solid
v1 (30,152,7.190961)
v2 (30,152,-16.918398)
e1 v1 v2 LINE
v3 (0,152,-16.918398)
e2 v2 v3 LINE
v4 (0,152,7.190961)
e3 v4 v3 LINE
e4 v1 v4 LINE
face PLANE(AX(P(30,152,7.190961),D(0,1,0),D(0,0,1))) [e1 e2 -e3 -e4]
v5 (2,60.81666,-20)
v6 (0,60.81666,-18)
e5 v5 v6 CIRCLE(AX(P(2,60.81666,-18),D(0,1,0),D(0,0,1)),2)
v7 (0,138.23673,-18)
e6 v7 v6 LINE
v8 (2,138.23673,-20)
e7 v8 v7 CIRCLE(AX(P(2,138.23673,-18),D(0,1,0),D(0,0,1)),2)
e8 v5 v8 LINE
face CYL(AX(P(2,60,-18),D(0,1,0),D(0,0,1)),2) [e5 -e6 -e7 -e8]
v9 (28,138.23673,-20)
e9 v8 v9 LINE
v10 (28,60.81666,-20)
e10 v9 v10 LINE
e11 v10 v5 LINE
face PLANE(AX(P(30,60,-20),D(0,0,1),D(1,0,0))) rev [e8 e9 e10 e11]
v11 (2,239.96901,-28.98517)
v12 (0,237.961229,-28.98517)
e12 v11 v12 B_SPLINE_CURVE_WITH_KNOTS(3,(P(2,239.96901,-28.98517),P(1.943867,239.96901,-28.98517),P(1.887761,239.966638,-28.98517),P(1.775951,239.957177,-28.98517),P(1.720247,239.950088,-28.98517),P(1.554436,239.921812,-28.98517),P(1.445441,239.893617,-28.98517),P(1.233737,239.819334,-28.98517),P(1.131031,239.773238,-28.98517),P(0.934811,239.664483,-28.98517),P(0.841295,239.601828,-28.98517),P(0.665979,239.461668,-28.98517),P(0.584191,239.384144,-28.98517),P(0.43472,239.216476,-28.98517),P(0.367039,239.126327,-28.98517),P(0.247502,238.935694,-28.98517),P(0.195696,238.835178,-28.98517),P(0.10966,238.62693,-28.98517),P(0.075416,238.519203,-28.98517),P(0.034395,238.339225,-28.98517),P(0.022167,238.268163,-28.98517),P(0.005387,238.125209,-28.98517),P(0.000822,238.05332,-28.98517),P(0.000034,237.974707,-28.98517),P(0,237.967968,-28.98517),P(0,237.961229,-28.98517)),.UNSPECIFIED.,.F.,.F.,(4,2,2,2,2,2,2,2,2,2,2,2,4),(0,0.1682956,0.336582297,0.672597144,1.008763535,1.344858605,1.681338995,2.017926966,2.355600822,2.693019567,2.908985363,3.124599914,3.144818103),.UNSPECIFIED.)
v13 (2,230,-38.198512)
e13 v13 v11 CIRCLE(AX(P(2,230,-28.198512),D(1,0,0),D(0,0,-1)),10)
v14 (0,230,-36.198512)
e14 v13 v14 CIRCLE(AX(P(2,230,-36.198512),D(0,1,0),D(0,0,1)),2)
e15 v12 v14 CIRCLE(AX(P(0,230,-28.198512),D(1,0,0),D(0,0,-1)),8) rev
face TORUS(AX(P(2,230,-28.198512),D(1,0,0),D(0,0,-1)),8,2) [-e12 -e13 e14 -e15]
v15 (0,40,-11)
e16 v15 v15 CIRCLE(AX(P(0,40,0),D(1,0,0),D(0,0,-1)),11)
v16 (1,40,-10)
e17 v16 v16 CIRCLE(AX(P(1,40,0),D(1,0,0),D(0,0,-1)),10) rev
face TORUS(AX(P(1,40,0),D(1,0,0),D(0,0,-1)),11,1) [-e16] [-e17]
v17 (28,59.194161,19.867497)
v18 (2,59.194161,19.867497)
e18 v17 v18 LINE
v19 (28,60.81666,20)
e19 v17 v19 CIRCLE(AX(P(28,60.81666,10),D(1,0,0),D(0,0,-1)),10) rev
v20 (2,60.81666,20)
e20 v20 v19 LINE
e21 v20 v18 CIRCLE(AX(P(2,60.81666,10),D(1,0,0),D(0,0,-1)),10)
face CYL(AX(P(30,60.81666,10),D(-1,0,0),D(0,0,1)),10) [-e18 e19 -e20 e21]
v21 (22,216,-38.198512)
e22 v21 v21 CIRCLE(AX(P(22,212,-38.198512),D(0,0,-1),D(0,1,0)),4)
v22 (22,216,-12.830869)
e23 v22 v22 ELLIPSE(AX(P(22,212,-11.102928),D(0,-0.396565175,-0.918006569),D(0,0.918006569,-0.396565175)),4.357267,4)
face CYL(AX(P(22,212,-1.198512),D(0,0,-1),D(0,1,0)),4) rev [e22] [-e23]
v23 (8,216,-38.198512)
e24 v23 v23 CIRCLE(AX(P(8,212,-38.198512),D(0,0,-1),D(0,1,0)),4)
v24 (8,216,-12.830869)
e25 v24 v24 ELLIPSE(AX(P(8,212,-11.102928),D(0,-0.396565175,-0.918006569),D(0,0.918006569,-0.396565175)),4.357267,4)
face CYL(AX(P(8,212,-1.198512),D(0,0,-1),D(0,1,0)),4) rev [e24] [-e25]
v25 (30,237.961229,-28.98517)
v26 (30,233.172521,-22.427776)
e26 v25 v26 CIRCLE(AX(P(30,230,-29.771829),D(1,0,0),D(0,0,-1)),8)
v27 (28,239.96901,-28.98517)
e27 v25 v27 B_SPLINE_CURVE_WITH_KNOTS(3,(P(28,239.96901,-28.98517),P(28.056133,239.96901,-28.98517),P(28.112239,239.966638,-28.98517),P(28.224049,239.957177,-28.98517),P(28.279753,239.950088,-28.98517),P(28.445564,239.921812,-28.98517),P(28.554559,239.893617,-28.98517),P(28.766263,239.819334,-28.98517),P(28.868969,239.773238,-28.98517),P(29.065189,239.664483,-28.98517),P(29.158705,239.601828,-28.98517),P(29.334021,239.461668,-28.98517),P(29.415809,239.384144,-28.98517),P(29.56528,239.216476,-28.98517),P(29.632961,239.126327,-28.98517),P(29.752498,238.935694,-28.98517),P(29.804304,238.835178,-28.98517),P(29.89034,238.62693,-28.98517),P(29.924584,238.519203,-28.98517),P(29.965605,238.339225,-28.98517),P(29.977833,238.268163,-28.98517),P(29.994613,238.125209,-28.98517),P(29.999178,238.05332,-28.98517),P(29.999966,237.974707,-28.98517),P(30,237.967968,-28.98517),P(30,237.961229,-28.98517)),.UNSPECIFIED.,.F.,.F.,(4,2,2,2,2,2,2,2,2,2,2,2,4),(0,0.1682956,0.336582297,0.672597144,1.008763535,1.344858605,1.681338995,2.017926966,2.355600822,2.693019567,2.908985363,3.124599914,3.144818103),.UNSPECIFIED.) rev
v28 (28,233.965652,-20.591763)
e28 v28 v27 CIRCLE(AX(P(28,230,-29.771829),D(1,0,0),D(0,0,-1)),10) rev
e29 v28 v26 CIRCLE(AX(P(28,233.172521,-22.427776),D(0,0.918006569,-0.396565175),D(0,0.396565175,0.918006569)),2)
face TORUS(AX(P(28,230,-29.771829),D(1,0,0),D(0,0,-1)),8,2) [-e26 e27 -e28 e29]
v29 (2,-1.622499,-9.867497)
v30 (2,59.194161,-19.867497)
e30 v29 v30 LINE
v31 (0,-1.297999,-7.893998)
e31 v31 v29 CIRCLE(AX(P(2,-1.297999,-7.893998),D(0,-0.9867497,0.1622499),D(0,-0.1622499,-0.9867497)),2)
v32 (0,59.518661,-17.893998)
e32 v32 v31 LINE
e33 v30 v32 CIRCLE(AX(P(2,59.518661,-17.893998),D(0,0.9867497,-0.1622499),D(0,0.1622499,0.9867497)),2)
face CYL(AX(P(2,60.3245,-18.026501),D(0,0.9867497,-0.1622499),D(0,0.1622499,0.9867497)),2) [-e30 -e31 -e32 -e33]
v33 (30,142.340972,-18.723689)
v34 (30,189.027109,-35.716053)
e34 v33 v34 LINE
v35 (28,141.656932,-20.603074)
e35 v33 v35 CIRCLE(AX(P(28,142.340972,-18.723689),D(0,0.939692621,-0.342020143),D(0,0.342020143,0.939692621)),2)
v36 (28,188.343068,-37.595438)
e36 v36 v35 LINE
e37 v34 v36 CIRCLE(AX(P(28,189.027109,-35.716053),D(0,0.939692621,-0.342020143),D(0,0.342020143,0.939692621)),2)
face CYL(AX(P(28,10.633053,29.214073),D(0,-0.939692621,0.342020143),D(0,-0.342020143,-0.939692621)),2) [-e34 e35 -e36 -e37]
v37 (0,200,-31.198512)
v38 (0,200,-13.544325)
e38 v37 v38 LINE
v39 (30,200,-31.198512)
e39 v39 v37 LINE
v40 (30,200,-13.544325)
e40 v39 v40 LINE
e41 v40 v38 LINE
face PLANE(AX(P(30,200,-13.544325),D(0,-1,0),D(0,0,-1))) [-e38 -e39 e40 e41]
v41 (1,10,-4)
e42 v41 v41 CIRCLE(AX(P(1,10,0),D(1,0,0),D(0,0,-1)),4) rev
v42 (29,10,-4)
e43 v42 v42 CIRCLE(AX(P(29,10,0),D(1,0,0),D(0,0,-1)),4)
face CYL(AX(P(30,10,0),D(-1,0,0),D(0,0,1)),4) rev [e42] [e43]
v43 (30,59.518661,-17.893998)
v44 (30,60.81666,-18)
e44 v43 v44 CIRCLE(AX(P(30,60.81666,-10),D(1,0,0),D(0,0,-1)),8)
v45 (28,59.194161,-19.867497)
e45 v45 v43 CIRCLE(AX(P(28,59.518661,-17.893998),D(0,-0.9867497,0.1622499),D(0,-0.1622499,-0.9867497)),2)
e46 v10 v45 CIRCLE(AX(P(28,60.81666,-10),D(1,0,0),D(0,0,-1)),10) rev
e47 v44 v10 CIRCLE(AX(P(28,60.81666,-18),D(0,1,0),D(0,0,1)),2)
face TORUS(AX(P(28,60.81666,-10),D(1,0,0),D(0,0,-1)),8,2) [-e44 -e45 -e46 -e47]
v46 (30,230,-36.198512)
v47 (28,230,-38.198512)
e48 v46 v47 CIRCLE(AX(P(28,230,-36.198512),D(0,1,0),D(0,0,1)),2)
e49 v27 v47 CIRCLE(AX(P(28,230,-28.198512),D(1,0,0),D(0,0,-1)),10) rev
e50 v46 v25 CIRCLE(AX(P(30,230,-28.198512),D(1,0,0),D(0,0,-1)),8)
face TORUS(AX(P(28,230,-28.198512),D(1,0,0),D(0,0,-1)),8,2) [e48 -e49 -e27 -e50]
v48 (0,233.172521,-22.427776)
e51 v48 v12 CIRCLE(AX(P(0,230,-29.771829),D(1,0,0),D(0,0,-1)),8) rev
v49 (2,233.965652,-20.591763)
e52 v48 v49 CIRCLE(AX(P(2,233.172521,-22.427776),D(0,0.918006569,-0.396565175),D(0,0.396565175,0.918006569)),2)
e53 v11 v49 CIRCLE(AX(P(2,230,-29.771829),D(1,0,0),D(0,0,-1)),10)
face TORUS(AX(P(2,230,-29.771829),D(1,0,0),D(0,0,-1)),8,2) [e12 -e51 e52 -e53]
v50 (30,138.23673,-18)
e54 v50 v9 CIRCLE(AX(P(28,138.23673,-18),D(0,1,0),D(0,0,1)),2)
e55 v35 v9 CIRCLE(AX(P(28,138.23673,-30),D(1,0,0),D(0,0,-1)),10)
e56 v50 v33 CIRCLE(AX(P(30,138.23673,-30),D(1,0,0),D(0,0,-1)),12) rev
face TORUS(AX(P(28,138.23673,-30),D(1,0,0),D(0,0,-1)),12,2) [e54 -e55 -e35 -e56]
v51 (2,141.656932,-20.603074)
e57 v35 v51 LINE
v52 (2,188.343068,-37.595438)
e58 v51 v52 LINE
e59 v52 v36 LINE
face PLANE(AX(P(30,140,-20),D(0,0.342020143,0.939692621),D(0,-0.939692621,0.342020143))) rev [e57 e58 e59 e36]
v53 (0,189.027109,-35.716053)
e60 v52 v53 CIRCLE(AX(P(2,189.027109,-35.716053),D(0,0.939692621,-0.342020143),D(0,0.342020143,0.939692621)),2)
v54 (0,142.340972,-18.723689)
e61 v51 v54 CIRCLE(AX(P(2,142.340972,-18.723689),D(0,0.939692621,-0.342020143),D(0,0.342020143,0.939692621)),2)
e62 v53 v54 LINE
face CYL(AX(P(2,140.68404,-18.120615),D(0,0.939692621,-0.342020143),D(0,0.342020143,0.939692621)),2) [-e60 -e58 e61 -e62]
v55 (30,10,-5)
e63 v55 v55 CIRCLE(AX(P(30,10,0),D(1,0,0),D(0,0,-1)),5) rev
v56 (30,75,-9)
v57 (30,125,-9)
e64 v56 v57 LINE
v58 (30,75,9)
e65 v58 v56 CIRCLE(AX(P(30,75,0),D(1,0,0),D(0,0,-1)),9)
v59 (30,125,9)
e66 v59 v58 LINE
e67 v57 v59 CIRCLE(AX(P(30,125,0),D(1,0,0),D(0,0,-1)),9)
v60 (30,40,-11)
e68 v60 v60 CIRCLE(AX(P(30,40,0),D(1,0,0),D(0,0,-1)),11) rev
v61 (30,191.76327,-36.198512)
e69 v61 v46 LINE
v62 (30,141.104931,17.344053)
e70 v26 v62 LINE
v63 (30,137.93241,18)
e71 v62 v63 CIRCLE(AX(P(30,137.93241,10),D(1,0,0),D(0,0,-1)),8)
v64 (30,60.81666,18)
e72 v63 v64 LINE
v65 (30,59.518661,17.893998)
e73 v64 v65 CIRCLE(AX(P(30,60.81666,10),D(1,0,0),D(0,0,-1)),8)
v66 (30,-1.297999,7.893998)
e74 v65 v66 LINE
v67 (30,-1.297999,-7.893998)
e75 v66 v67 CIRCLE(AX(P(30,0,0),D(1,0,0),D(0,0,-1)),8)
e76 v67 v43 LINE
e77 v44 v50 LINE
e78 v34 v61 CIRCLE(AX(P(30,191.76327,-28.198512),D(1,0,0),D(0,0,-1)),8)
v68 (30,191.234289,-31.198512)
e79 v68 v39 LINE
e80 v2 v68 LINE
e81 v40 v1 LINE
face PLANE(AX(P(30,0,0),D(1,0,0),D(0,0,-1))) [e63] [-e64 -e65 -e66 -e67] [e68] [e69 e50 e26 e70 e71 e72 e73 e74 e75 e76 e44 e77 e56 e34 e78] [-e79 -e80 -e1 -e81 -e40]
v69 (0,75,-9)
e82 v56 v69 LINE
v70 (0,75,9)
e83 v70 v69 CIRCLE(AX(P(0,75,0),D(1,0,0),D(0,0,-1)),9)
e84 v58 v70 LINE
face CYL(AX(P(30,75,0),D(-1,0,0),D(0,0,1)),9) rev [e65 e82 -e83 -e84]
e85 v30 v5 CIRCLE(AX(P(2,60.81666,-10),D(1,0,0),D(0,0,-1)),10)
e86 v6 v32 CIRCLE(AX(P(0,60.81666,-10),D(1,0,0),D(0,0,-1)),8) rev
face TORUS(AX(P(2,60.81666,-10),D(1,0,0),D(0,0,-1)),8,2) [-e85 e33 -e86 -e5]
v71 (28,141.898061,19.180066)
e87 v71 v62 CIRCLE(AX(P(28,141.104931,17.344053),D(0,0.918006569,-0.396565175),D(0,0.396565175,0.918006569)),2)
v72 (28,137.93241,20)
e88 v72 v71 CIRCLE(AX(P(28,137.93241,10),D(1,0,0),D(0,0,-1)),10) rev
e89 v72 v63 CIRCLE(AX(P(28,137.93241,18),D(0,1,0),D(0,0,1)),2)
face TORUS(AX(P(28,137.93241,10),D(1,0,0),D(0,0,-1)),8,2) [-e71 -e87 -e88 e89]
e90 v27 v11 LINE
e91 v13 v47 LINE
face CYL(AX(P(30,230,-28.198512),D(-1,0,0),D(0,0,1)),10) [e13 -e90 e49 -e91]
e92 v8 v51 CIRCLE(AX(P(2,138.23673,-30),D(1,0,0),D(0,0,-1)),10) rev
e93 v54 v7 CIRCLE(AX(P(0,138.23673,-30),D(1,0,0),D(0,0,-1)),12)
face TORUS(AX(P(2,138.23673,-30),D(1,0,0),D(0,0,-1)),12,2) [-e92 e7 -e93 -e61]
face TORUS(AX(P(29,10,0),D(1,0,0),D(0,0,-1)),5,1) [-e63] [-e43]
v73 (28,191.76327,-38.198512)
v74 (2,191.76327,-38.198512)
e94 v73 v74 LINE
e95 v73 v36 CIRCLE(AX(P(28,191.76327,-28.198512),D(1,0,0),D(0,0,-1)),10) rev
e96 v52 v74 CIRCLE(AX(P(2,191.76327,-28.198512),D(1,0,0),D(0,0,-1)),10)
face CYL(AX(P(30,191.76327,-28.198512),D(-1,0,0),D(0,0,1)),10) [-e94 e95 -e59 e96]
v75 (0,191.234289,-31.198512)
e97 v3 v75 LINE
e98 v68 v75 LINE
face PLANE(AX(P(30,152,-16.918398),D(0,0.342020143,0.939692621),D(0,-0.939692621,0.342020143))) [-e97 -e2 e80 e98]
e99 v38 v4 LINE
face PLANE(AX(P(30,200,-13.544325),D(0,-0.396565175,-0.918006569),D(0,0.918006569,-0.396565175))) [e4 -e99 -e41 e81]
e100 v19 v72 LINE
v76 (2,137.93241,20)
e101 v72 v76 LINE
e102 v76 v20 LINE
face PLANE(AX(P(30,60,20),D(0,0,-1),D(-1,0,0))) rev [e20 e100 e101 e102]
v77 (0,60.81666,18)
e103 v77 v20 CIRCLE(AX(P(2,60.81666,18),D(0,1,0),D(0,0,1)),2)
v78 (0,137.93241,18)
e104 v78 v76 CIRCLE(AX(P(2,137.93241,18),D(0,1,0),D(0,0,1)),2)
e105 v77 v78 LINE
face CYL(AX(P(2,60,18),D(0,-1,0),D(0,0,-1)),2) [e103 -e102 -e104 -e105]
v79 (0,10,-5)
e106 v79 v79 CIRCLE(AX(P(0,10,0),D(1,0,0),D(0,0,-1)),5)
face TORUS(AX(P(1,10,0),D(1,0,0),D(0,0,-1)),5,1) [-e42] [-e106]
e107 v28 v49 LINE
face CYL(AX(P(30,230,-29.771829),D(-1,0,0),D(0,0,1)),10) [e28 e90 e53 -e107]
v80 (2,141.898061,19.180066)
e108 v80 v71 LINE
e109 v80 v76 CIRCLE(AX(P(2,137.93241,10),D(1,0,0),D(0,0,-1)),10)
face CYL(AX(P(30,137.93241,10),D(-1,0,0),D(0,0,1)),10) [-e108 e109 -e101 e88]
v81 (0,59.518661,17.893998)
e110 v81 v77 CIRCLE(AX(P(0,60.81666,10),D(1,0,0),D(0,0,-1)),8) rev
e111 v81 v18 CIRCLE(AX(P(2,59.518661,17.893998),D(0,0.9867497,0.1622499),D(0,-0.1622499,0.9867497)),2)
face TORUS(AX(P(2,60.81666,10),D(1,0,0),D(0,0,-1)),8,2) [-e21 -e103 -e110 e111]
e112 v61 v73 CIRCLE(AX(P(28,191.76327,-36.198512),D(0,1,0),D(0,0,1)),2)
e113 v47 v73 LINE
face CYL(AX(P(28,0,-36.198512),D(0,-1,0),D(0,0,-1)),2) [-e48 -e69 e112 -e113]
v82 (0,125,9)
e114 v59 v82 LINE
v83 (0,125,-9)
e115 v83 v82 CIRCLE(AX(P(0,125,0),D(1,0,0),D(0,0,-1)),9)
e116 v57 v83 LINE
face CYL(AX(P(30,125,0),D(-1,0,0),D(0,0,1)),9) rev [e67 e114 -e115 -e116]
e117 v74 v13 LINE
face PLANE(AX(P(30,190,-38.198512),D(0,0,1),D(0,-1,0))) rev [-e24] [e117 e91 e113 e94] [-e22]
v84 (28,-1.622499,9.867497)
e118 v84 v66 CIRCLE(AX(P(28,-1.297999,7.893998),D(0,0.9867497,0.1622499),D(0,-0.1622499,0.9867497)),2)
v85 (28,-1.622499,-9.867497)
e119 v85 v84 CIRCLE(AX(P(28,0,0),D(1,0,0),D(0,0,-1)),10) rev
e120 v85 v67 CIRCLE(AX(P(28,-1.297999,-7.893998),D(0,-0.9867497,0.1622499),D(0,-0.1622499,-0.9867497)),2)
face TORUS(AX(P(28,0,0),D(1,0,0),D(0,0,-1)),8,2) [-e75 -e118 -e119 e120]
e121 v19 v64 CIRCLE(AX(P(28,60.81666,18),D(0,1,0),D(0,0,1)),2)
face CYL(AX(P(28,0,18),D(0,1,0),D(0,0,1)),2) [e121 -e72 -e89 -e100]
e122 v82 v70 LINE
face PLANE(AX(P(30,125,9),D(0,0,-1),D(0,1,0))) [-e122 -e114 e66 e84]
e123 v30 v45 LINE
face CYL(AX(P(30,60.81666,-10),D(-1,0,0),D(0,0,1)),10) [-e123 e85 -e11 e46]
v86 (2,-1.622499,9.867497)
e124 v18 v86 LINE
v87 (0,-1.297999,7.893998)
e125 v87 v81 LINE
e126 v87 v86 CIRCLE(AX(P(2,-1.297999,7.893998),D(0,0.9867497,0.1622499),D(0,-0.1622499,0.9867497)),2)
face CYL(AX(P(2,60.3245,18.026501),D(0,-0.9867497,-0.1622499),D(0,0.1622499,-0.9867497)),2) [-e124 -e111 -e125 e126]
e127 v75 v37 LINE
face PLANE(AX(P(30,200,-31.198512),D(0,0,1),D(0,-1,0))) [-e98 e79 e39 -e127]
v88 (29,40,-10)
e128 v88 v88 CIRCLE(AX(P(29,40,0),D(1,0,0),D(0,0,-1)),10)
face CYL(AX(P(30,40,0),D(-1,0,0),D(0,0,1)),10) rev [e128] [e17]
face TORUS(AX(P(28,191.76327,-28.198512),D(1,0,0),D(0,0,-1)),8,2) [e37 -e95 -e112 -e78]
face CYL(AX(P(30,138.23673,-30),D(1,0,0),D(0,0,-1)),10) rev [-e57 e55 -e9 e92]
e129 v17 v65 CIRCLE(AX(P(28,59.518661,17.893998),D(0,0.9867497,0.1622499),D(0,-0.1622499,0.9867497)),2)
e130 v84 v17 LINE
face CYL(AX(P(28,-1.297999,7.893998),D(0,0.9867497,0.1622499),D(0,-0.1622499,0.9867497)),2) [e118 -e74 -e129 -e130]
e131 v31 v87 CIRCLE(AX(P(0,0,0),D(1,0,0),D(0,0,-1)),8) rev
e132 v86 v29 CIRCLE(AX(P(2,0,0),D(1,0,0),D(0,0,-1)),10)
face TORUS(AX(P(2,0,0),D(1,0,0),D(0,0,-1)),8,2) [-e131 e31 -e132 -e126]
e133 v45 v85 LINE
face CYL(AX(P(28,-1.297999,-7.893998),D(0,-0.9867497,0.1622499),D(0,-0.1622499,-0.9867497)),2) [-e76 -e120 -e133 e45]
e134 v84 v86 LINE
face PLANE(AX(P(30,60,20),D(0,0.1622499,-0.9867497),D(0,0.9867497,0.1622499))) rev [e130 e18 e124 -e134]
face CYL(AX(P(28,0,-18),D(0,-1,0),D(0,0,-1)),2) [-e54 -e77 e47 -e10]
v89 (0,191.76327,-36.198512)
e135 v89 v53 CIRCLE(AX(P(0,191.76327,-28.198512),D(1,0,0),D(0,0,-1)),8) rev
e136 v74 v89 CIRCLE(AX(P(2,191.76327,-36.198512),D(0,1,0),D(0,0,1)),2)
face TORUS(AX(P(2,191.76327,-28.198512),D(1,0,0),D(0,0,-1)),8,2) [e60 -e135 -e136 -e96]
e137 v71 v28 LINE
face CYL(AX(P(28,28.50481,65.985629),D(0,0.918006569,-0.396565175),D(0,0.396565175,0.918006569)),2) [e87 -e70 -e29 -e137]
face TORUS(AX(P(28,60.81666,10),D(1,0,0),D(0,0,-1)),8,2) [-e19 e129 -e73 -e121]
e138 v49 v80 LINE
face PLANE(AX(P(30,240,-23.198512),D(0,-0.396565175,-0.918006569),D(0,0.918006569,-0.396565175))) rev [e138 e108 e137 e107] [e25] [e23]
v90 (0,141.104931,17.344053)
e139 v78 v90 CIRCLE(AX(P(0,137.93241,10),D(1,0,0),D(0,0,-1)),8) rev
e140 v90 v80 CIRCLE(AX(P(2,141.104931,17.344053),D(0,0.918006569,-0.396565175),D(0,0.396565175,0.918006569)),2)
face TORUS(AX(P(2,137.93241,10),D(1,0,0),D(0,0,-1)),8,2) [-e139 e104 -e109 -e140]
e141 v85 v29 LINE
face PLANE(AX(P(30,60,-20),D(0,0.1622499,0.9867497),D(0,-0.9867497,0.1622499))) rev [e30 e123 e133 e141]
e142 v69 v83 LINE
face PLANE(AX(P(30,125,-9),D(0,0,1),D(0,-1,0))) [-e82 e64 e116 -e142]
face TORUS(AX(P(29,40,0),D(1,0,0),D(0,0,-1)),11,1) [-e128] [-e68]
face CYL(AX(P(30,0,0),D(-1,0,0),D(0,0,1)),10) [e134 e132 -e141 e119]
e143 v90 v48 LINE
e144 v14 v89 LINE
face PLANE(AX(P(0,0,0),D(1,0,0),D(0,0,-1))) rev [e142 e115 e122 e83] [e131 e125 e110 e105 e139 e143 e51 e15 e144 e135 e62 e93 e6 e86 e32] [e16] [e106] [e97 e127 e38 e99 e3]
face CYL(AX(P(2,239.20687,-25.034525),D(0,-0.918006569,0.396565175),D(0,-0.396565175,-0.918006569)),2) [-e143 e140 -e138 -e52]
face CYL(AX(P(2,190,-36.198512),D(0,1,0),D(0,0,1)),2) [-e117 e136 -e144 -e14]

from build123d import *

# Parameters (mm, degrees)
SKETCH2_R           = 4
SKETCH2_R_2         = 10
BOSS_EXTRUDE1_DEPTH = 30
FILLET1_R           = 10
SKETCH3_R           = 4
CUT_EXTRUDE1_DEPTH  = 37
FILLET2_R           = 2
FILLET3_R           = 1


with BuildPart() as part:
    # Sketch2 → Boss-Extrude1 (new body)
    with BuildSketch(Plane(origin=(0, 0, 0), x_dir=(0, 0, -1), z_dir=(1, 0, 0))):
        with BuildLine():
            Line((-20, 60), (-9.867496998, -1.622498999))
            ThreePointArc((-9.867496998, -1.622498999), (0, -10), (9.867496998, -1.622498999))
            Line((9.867496998, -1.622498999), (20, 60))
            Line((20, 60), (20, 140))
            Line((20, 140), (38.198511713, 190))
            Line((38.198511713, 190), (38.198511713, 240))
            Line((38.198511713, 240), (23.198511713, 240))
            Line((23.198511713, 240), (-20, 140))
            Line((-20, 140), (-20, 60))
        make_face()
        with Locations((0, 10)):
            Circle(SKETCH2_R, mode=Mode.SUBTRACT)
        with Locations((0, 40)):
            Circle(SKETCH2_R_2, mode=Mode.SUBTRACT)
        with BuildLine():
            Line((9, 125), (9, 75))
            ThreePointArc((9, 75), (0, 66), (-9, 75))
            Line((-9, 75), (-9, 125))
            ThreePointArc((-9, 125), (0, 134), (9, 125))
        make_face(mode=Mode.SUBTRACT)
        Polygon((16.918398404, 152), (31.198511713, 191.234288865), (31.198511713, 200), (13.544324791, 200), (-7.190960832, 152), align=None, mode=Mode.SUBTRACT)
    extrude(amount=BOSS_EXTRUDE1_DEPTH)

    # Fillet1
    # the kernel refuses this fillet: 10 mm, written as the material it adds along each edge
    with BuildSketch(Plane(origin=(0, 140, -20), x_dir=(0, -1, 0), z_dir=(1, 0, 0))) as fillet1_piece_1:
        with BuildLine():
            CenterArc((FILLET1_R * 0.176326980708, FILLET1_R), FILLET1_R, 250, 20)
            Line((-FILLET1_R * 0.165693162617, FILLET1_R * 0.0603073792141), (0, 0))
            Line((0, 0), (FILLET1_R * 0.176326980708, 0))
        make_face()
    extrude(amount=30)
    # the kernel refuses this fillet: 10 mm, written as the material it takes off along each edge
    with BuildSketch(Plane(origin=(-4.408174518, 190, -38.198511713), x_dir=(0, -0.9396926207859084, 0.34202014332566866), z_dir=(1, 0, 0))) as fillet1_2_piece_1:
        with BuildLine():
            CenterArc((FILLET1_R * 0.176326980708, -FILLET1_R), FILLET1_R, 90, 20)
            Line((-FILLET1_R * 0.165693162617, -FILLET1_R * 0.0603073792141), (0, 0))
            Line((0, 0), (FILLET1_R * 0.176326980708, 0))
        make_face()
    extrude(amount=38.816349035, mode=Mode.SUBTRACT)
    with BuildSketch(Plane(origin=(-2.041649987, 60, -20), x_dir=(0, -0.9867496997597593, 0.16224989991992267), z_dir=(1, 0, 0))) as fillet1_2_piece_2:
        with BuildLine():
            CenterArc((FILLET1_R * 0.0816659994661, -FILLET1_R), FILLET1_R, 90, 9.337512654)
            Line((-FILLET1_R * 0.0805839004538, -FILLET1_R * 0.0132503002402), (0, 0))
            Line((0, 0), (FILLET1_R * 0.0816659994661, 0))
        make_face()
    extrude(amount=34.083299973, mode=Mode.SUBTRACT)
    with BuildSketch(Plane(origin=(-2.041649987, 60, 20), x_dir=(0, -0.98674969975976, -0.16224989991991845), z_dir=(1, 0, 0))) as fillet1_2_piece_3:
        with BuildLine():
            CenterArc((FILLET1_R * 0.0816659994661, FILLET1_R), FILLET1_R, 260.662487346, 9.337512654)
            Line((-FILLET1_R * 0.0805839004538, FILLET1_R * 0.0132503002402), (0, 0))
            Line((0, 0), (FILLET1_R * 0.0816659994661, 0))
        make_face()
    extrude(amount=34.083299973, mode=Mode.SUBTRACT)
    with BuildSketch(Plane(origin=(-16.433292653, 240, -23.198511713), x_dir=(0, -0.9180065694869886, 0.39656517544879144), z_dir=(1, 0, 0))) as fillet1_2_piece_4:
        with BuildLine():
            CenterArc((FILLET1_R * 0.657331706121, FILLET1_R), FILLET1_R, 203.363625857, 66.636374143)
            Line((-FILLET1_R * 0.260674863366, FILLET1_R * 0.603434824551), (0, 0))
            Line((0, 0), (FILLET1_R * 0.657331706121, 0))
        make_face()
    extrude(amount=62.866585306, mode=Mode.SUBTRACT)
    with BuildSketch(Plane(origin=(-25, 240, -38.198511713), x_dir=(0, -1, 0), z_dir=(1, 0, 0))) as fillet1_2_piece_5:
        with BuildLine():
            CenterArc((FILLET1_R, -FILLET1_R), FILLET1_R, 90, 90)
            Line((0, -FILLET1_R), (0, 0))
            Line((0, 0), (FILLET1_R, 0))
        make_face()
    extrude(amount=80, mode=Mode.SUBTRACT)
    with BuildSketch(Plane(origin=(-5.168975719, 140, 20), x_dir=(0, -1, 0), z_dir=(1, 0, 0))) as fillet1_2_piece_6:
        with BuildLine():
            CenterArc((FILLET1_R * 0.206759028753, FILLET1_R), FILLET1_R, 246.636374143, 23.363625857)
            Line((-FILLET1_R * 0.189806146696, FILLET1_R * 0.081993430513), (0, 0))
            Line((0, 0), (FILLET1_R * 0.206759028753, 0))
        make_face()
    extrude(amount=40.337951438, mode=Mode.SUBTRACT)

    # Sketch3 → Cut-Extrude1 (cut)
    with BuildSketch(Plane(origin=(0, 0, -38.198511713), x_dir=(-1, 0, 0), z_dir=(0, 0, -1))):
        with Locations(Location((-8, 212, 0), (0, 0, 90))):
            Circle(SKETCH3_R)
        with Locations(Location((-22, 212, 0), (0, 0, 90))):
            Circle(SKETCH3_R)
    extrude(amount=-CUT_EXTRUDE1_DEPTH, mode=Mode.SUBTRACT)

    # Fillet2
    # the kernel refuses this fillet: 2 mm, written as the material it takes off along each edge
    with BuildSketch(Plane(origin=(30, 0, 0), x_dir=(0, -0.16224989991992037, 0.9867496997597597), z_dir=(0, 0.9867496997597597, 0.16224989991992037))) as fillet2_piece_1:
        with BuildLine():
            CenterArc((10 - FILLET2_R, -FILLET2_R), FILLET2_R, 0, 90)
            Line((10, -FILLET2_R), (10, 0))
            Line((10, 0), (10 - FILLET2_R, 0))
        make_face()
    revolve(axis=Axis((30, 0, 0), (1, 0, 0)), revolution_arc=161.324974693, mode=Mode.SUBTRACT)
    with BuildSketch(Plane(origin=(30, -1.622498999, -9.867496998), x_dir=(0, 0.16224989991992012, 0.9867496997597598), z_dir=(0, 0.9867496997597597, -0.1622498999199201)), Plane(origin=(30, 59.194160995, 19.867496998), x_dir=(0, 0.1622498999199198, -0.9867496997597598), z_dir=(0, -0.9867496997597598, -0.16224989991991978))) as fillet2_piece_2:
        with BuildLine():
            CenterArc((FILLET2_R, -FILLET2_R), FILLET2_R, 90, 90)
            Line((0, -FILLET2_R), (0, 0))
            Line((0, 0), (FILLET2_R, 0))
        make_face()
    extrude(amount=61.633319989, mode=Mode.SUBTRACT)
    with BuildSketch(Plane(origin=(0, 233.965651754, -20.59176308), x_dir=(0, -0.3965651754487914, -0.9180065694869888), z_dir=(0, -0.9180065694869887, 0.3965651754487914))) as fillet2_piece_3:
        with BuildLine():
            CenterArc((FILLET2_R, FILLET2_R), FILLET2_R, 180, 90)
            Line((0, FILLET2_R), (0, 0))
            Line((0, 0), (FILLET2_R, 0))
        make_face()
    extrude(amount=100.290774977, mode=Mode.SUBTRACT)
    with BuildSketch(Plane(origin=(30, 233.965651754, -20.59176308), x_dir=(0, -0.3965651754487914, -0.9180065694869888), z_dir=(0, -0.9180065694869887, 0.3965651754487914))) as fillet2_piece_4:
        with BuildLine():
            CenterArc((FILLET2_R, -FILLET2_R), FILLET2_R, 90, 90)
            Line((0, -FILLET2_R), (0, 0))
            Line((0, 0), (FILLET2_R, 0))
        make_face()
    extrude(amount=100.290774977, mode=Mode.SUBTRACT)
    with BuildSketch(Plane(origin=(0, 191.763269807, -38.198511713), x_dir=(0, 0, 1), z_dir=(0, 1, 0))) as fillet2_piece_5:
        with BuildLine():
            CenterArc((FILLET2_R, FILLET2_R), FILLET2_R, 180, 90)
            Line((0, FILLET2_R), (0, 0))
            Line((0, 0), (FILLET2_R, 0))
        make_face()
    extrude(amount=38.236730193, mode=Mode.SUBTRACT)
    with BuildSketch(Plane(origin=(0, 141.656931626, -20.603073792), x_dir=(1, 0, 0), z_dir=(0, 0.9396926207859095, -0.34202014332566566))) as fillet2_piece_6:
        with BuildLine():
            CenterArc((FILLET2_R, -FILLET2_R), FILLET2_R, 90, 90)
            Line((0, -FILLET2_R), (0, 0))
            Line((0, 0), (FILLET2_R, 0))
        make_face()
    extrude(amount=49.68234901, mode=Mode.SUBTRACT)
    with BuildSketch(Plane(origin=(0, 60.816659995, -20), x_dir=(1, 0, 0), z_dir=(0, 1, 0))) as fillet2_piece_7:
        with BuildLine():
            CenterArc((FILLET2_R, -FILLET2_R), FILLET2_R, 90, 90)
            Line((0, -FILLET2_R), (0, 0))
            Line((0, 0), (FILLET2_R, 0))
        make_face()
    extrude(amount=77.420070198, mode=Mode.SUBTRACT)
    with BuildSketch(Plane(origin=(0, 59.194160995, 19.867496998), x_dir=(0, 0.1622498999199198, -0.9867496997597598), z_dir=(0, -0.9867496997597598, -0.16224989991991978)), Plane(origin=(0, -1.622498999, -9.867496998), x_dir=(0, 0.16224989991992012, 0.9867496997597598), z_dir=(0, 0.9867496997597597, -0.1622498999199201))) as fillet2_piece_8:
        with BuildLine():
            CenterArc((FILLET2_R, FILLET2_R), FILLET2_R, 180, 90)
            Line((0, FILLET2_R), (0, 0))
            Line((0, 0), (FILLET2_R, 0))
        make_face()
    extrude(amount=61.633319989, mode=Mode.SUBTRACT)
    with BuildSketch(Plane(origin=(0, 137.932409712, 20), x_dir=(0, 0, -1), z_dir=(0, -1, 0))) as fillet2_piece_9:
        with BuildLine():
            CenterArc((FILLET2_R, FILLET2_R), FILLET2_R, 180, 90)
            Line((0, FILLET2_R), (0, 0))
            Line((0, 0), (FILLET2_R, 0))
        make_face()
    extrude(amount=77.115749718, mode=Mode.SUBTRACT)
    with BuildSketch(Plane(origin=(0, 60.816659995, 10), x_dir=(0, -0.1622498999199592, 0.9867496997597532), z_dir=(0, -0.9867496997597532, -0.1622498999199592))) as fillet2_piece_10:
        with BuildLine():
            CenterArc((10 - FILLET2_R, -FILLET2_R), FILLET2_R, 0, 90)
            Line((10, -FILLET2_R), (10, 0))
            Line((10, 0), (10 - FILLET2_R, 0))
        make_face()
    revolve(axis=Axis((0, 60.816659995, 10), (-1, 0, 0)), revolution_arc=9.337512654, mode=Mode.SUBTRACT)
    with BuildSketch(Plane(origin=(0, 60.816659995, -10), x_dir=(0, 0, -1), z_dir=(0, 1, 0))) as fillet2_piece_11:
        with BuildLine():
            CenterArc((10 - FILLET2_R, -FILLET2_R), FILLET2_R, 0, 90)
            Line((10, -FILLET2_R), (10, 0))
            Line((10, 0), (10 - FILLET2_R, 0))
        make_face()
    revolve(axis=Axis((0, 60.816659995, -10), (-1, 0, 0)), revolution_arc=9.337512654, mode=Mode.SUBTRACT)
    with BuildSketch(Plane(origin=(0, 191.763269807, -28.198511713), x_dir=(0, 0, -1), z_dir=(0, 1, 0))) as fillet2_piece_12:
        with BuildLine():
            CenterArc((10 - FILLET2_R, -FILLET2_R), FILLET2_R, 0, 90)
            Line((10, -FILLET2_R), (10, 0))
            Line((10, 0), (10 - FILLET2_R, 0))
        make_face()
    revolve(axis=Axis((0, 191.763269807, -28.198511713), (-1, 0, 0)), revolution_arc=20, mode=Mode.SUBTRACT)
    with BuildSketch(Plane(origin=(0, 137.932409712, 10), x_dir=(0, 0, 1), z_dir=(0, -1, 0))) as fillet2_piece_13:
        with BuildLine():
            CenterArc((10 - FILLET2_R, -FILLET2_R), FILLET2_R, 0, 90)
            Line((10, -FILLET2_R), (10, 0))
            Line((10, 0), (10 - FILLET2_R, 0))
        make_face()
    revolve(axis=Axis((0, 137.932409712, 10), (-1, 0, 0)), revolution_arc=23.363625857, mode=Mode.SUBTRACT)
    with BuildSketch(Plane(origin=(0, 230, -28.198511713), x_dir=(0, 0.9125032729031795, 0.4090694035747302), z_dir=(0, -0.4090694035747302, 0.9125032729031795))) as fillet2_piece_14:
        with BuildLine():
            CenterArc((10 - FILLET2_R, -FILLET2_R), FILLET2_R, 0, 90)
            Line((10, -FILLET2_R), (10, 0))
            Line((10, 0), (10 - FILLET2_R, 0))
        make_face()
    revolve(axis=Axis((0, 230, -28.198511713), (-1, 0, 0)), revolution_arc=114.146389586, mode=Mode.SUBTRACT)
    with BuildSketch(Plane(origin=(0, 230, -29.771828775), x_dir=(0, 0.3965651754489641, 0.9180065694869141), z_dir=(0, -0.9180065694869141, 0.3965651754489641))) as fillet2_piece_15:
        with BuildLine():
            CenterArc((10 - FILLET2_R, -FILLET2_R), FILLET2_R, 0, 90)
            Line((10, -FILLET2_R), (10, 0))
            Line((10, 0), (10 - FILLET2_R, 0))
        make_face()
    revolve(axis=Axis((0, 230, -29.771828775), (-1, 0, 0)), revolution_arc=90.777863366, mode=Mode.SUBTRACT)
    with BuildSketch(Plane(origin=(30, 191.763269807, -38.198511713), x_dir=(0, 0, 1), z_dir=(0, 1, 0))) as fillet2_piece_16:
        with BuildLine():
            CenterArc((FILLET2_R, -FILLET2_R), FILLET2_R, 90, 90)
            Line((0, -FILLET2_R), (0, 0))
            Line((0, 0), (FILLET2_R, 0))
        make_face()
    extrude(amount=38.236730193, mode=Mode.SUBTRACT)
    with BuildSketch(Plane(origin=(30, 137.932409712, 20), x_dir=(0, 0, -1), z_dir=(0, -1, 0))) as fillet2_piece_17:
        with BuildLine():
            CenterArc((FILLET2_R, -FILLET2_R), FILLET2_R, 90, 90)
            Line((0, -FILLET2_R), (0, 0))
            Line((0, 0), (FILLET2_R, 0))
        make_face()
    extrude(amount=77.115749718, mode=Mode.SUBTRACT)
    with BuildSketch(Plane(origin=(30, 60.816659995, -20), x_dir=(-1, 0, 0), z_dir=(0, 1, 0))) as fillet2_piece_18:
        with BuildLine():
            CenterArc((FILLET2_R, FILLET2_R), FILLET2_R, 180, 90)
            Line((0, FILLET2_R), (0, 0))
            Line((0, 0), (FILLET2_R, 0))
        make_face()
    extrude(amount=77.420070198, mode=Mode.SUBTRACT)
    with BuildSketch(Plane(origin=(30, 141.656931626, -20.603073792), x_dir=(-1, 0, 0), z_dir=(0, 0.9396926207859095, -0.34202014332566566))) as fillet2_piece_19:
        with BuildLine():
            CenterArc((FILLET2_R, FILLET2_R), FILLET2_R, 180, 90)
            Line((0, FILLET2_R), (0, 0))
            Line((0, 0), (FILLET2_R, 0))
        make_face()
    extrude(amount=49.68234901, mode=Mode.SUBTRACT)
    with BuildSketch(Plane(origin=(30, 60.816659995, 10), x_dir=(0, -0.1622498999199592, 0.9867496997597532), z_dir=(0, -0.9867496997597532, -0.1622498999199592))) as fillet2_piece_20:
        with BuildLine():
            CenterArc((10 - FILLET2_R, FILLET2_R), FILLET2_R, 270, 90)
            Line((10, FILLET2_R), (10, 0))
            Line((10, 0), (10 - FILLET2_R, 0))
        make_face()
    revolve(axis=Axis((30, 60.816659995, 10), (-1, 0, 0)), revolution_arc=9.337512654, mode=Mode.SUBTRACT)
    with BuildSketch(Plane(origin=(30, 60.816659995, -10), x_dir=(0, 0, -1), z_dir=(0, 1, 0))) as fillet2_piece_21:
        with BuildLine():
            CenterArc((10 - FILLET2_R, FILLET2_R), FILLET2_R, 270, 90)
            Line((10, FILLET2_R), (10, 0))
            Line((10, 0), (10 - FILLET2_R, 0))
        make_face()
    revolve(axis=Axis((30, 60.816659995, -10), (-1, 0, 0)), revolution_arc=9.337512654, mode=Mode.SUBTRACT)
    with BuildSketch(Plane(origin=(30, 191.763269807, -28.198511713), x_dir=(0, 0, -1), z_dir=(0, 1, 0))) as fillet2_piece_22:
        with BuildLine():
            CenterArc((10 - FILLET2_R, FILLET2_R), FILLET2_R, 270, 90)
            Line((10, FILLET2_R), (10, 0))
            Line((10, 0), (10 - FILLET2_R, 0))
        make_face()
    revolve(axis=Axis((30, 191.763269807, -28.198511713), (-1, 0, 0)), revolution_arc=20, mode=Mode.SUBTRACT)
    with BuildSketch(Plane(origin=(30, 137.932409712, 10), x_dir=(0, 0, 1), z_dir=(0, -1, 0))) as fillet2_piece_23:
        with BuildLine():
            CenterArc((10 - FILLET2_R, FILLET2_R), FILLET2_R, 270, 90)
            Line((10, FILLET2_R), (10, 0))
            Line((10, 0), (10 - FILLET2_R, 0))
        make_face()
    revolve(axis=Axis((30, 137.932409712, 10), (-1, 0, 0)), revolution_arc=23.363625857, mode=Mode.SUBTRACT)
    with BuildSketch(Plane(origin=(30, 230, -28.198511713), x_dir=(0, 0.9125032729031795, 0.4090694035747302), z_dir=(0, -0.4090694035747302, 0.9125032729031795))) as fillet2_piece_24:
        with BuildLine():
            CenterArc((10 - FILLET2_R, FILLET2_R), FILLET2_R, 270, 90)
            Line((10, FILLET2_R), (10, 0))
            Line((10, 0), (10 - FILLET2_R, 0))
        make_face()
    revolve(axis=Axis((30, 230, -28.198511713), (-1, 0, 0)), revolution_arc=114.146389586, mode=Mode.SUBTRACT)
    with BuildSketch(Plane(origin=(30, 230, -29.771828775), x_dir=(0, 0.3965651754489641, 0.9180065694869141), z_dir=(0, -0.9180065694869141, 0.3965651754489641))) as fillet2_piece_25:
        with BuildLine():
            CenterArc((10 - FILLET2_R, FILLET2_R), FILLET2_R, 270, 90)
            Line((10, FILLET2_R), (10, 0))
            Line((10, 0), (10 - FILLET2_R, 0))
        make_face()
    revolve(axis=Axis((30, 230, -29.771828775), (-1, 0, 0)), revolution_arc=90.777863366, mode=Mode.SUBTRACT)
    with BuildSketch(Plane(origin=(0, 138.236730193, -30), x_dir=(0, 0.3420201433256692, 0.9396926207859082), z_dir=(0, 0.9396926207859082, -0.3420201433256692))) as fillet2_piece_26:
        with BuildLine():
            CenterArc((10 + FILLET2_R, FILLET2_R), FILLET2_R, 180, 90)
            Line((10 + FILLET2_R, 0), (10, 0))
            Line((10, 0), (10, FILLET2_R))
        make_face()
    revolve(axis=Axis((0, 138.236730193, -30), (1, 0, 0)), revolution_arc=20, mode=Mode.SUBTRACT)
    with BuildSketch(Plane(origin=(30, 138.236730193, -30), x_dir=(0, 0.3420201433256692, 0.9396926207859082), z_dir=(0, 0.9396926207859082, -0.3420201433256692))) as fillet2_piece_27:
        with BuildLine():
            CenterArc((10 + FILLET2_R, -FILLET2_R), FILLET2_R, 90, 90)
            Line((10 + FILLET2_R, 0), (10, 0))
            Line((10, 0), (10, -FILLET2_R))
        make_face()
    revolve(axis=Axis((30, 138.236730193, -30), (1, 0, 0)), revolution_arc=20, mode=Mode.SUBTRACT)
    with BuildSketch(Plane(origin=(0, 0, 0), x_dir=(0, -0.16224989991992037, 0.9867496997597597), z_dir=(0, 0.9867496997597597, 0.16224989991992037))) as fillet2_piece_28:
        with BuildLine():
            CenterArc((10 - FILLET2_R, FILLET2_R), FILLET2_R, 270, 90)
            Line((10, FILLET2_R), (10, 0))
            Line((10, 0), (10 - FILLET2_R, 0))
        make_face()
    revolve(axis=Axis((0, 0, 0), (1, 0, 0)), revolution_arc=161.324974693, mode=Mode.SUBTRACT)

    # Fillet3
    fillet3_edges = [part.edges().sort_by_distance(p)[0] for p in [
        (0, 40, 10),
        (30, 40, 10),
        (0, 10, 4),
        (30, 10, 4),
    ]]
    fillet(fillet3_edges, radius=FILLET3_R)


solid = part.part
